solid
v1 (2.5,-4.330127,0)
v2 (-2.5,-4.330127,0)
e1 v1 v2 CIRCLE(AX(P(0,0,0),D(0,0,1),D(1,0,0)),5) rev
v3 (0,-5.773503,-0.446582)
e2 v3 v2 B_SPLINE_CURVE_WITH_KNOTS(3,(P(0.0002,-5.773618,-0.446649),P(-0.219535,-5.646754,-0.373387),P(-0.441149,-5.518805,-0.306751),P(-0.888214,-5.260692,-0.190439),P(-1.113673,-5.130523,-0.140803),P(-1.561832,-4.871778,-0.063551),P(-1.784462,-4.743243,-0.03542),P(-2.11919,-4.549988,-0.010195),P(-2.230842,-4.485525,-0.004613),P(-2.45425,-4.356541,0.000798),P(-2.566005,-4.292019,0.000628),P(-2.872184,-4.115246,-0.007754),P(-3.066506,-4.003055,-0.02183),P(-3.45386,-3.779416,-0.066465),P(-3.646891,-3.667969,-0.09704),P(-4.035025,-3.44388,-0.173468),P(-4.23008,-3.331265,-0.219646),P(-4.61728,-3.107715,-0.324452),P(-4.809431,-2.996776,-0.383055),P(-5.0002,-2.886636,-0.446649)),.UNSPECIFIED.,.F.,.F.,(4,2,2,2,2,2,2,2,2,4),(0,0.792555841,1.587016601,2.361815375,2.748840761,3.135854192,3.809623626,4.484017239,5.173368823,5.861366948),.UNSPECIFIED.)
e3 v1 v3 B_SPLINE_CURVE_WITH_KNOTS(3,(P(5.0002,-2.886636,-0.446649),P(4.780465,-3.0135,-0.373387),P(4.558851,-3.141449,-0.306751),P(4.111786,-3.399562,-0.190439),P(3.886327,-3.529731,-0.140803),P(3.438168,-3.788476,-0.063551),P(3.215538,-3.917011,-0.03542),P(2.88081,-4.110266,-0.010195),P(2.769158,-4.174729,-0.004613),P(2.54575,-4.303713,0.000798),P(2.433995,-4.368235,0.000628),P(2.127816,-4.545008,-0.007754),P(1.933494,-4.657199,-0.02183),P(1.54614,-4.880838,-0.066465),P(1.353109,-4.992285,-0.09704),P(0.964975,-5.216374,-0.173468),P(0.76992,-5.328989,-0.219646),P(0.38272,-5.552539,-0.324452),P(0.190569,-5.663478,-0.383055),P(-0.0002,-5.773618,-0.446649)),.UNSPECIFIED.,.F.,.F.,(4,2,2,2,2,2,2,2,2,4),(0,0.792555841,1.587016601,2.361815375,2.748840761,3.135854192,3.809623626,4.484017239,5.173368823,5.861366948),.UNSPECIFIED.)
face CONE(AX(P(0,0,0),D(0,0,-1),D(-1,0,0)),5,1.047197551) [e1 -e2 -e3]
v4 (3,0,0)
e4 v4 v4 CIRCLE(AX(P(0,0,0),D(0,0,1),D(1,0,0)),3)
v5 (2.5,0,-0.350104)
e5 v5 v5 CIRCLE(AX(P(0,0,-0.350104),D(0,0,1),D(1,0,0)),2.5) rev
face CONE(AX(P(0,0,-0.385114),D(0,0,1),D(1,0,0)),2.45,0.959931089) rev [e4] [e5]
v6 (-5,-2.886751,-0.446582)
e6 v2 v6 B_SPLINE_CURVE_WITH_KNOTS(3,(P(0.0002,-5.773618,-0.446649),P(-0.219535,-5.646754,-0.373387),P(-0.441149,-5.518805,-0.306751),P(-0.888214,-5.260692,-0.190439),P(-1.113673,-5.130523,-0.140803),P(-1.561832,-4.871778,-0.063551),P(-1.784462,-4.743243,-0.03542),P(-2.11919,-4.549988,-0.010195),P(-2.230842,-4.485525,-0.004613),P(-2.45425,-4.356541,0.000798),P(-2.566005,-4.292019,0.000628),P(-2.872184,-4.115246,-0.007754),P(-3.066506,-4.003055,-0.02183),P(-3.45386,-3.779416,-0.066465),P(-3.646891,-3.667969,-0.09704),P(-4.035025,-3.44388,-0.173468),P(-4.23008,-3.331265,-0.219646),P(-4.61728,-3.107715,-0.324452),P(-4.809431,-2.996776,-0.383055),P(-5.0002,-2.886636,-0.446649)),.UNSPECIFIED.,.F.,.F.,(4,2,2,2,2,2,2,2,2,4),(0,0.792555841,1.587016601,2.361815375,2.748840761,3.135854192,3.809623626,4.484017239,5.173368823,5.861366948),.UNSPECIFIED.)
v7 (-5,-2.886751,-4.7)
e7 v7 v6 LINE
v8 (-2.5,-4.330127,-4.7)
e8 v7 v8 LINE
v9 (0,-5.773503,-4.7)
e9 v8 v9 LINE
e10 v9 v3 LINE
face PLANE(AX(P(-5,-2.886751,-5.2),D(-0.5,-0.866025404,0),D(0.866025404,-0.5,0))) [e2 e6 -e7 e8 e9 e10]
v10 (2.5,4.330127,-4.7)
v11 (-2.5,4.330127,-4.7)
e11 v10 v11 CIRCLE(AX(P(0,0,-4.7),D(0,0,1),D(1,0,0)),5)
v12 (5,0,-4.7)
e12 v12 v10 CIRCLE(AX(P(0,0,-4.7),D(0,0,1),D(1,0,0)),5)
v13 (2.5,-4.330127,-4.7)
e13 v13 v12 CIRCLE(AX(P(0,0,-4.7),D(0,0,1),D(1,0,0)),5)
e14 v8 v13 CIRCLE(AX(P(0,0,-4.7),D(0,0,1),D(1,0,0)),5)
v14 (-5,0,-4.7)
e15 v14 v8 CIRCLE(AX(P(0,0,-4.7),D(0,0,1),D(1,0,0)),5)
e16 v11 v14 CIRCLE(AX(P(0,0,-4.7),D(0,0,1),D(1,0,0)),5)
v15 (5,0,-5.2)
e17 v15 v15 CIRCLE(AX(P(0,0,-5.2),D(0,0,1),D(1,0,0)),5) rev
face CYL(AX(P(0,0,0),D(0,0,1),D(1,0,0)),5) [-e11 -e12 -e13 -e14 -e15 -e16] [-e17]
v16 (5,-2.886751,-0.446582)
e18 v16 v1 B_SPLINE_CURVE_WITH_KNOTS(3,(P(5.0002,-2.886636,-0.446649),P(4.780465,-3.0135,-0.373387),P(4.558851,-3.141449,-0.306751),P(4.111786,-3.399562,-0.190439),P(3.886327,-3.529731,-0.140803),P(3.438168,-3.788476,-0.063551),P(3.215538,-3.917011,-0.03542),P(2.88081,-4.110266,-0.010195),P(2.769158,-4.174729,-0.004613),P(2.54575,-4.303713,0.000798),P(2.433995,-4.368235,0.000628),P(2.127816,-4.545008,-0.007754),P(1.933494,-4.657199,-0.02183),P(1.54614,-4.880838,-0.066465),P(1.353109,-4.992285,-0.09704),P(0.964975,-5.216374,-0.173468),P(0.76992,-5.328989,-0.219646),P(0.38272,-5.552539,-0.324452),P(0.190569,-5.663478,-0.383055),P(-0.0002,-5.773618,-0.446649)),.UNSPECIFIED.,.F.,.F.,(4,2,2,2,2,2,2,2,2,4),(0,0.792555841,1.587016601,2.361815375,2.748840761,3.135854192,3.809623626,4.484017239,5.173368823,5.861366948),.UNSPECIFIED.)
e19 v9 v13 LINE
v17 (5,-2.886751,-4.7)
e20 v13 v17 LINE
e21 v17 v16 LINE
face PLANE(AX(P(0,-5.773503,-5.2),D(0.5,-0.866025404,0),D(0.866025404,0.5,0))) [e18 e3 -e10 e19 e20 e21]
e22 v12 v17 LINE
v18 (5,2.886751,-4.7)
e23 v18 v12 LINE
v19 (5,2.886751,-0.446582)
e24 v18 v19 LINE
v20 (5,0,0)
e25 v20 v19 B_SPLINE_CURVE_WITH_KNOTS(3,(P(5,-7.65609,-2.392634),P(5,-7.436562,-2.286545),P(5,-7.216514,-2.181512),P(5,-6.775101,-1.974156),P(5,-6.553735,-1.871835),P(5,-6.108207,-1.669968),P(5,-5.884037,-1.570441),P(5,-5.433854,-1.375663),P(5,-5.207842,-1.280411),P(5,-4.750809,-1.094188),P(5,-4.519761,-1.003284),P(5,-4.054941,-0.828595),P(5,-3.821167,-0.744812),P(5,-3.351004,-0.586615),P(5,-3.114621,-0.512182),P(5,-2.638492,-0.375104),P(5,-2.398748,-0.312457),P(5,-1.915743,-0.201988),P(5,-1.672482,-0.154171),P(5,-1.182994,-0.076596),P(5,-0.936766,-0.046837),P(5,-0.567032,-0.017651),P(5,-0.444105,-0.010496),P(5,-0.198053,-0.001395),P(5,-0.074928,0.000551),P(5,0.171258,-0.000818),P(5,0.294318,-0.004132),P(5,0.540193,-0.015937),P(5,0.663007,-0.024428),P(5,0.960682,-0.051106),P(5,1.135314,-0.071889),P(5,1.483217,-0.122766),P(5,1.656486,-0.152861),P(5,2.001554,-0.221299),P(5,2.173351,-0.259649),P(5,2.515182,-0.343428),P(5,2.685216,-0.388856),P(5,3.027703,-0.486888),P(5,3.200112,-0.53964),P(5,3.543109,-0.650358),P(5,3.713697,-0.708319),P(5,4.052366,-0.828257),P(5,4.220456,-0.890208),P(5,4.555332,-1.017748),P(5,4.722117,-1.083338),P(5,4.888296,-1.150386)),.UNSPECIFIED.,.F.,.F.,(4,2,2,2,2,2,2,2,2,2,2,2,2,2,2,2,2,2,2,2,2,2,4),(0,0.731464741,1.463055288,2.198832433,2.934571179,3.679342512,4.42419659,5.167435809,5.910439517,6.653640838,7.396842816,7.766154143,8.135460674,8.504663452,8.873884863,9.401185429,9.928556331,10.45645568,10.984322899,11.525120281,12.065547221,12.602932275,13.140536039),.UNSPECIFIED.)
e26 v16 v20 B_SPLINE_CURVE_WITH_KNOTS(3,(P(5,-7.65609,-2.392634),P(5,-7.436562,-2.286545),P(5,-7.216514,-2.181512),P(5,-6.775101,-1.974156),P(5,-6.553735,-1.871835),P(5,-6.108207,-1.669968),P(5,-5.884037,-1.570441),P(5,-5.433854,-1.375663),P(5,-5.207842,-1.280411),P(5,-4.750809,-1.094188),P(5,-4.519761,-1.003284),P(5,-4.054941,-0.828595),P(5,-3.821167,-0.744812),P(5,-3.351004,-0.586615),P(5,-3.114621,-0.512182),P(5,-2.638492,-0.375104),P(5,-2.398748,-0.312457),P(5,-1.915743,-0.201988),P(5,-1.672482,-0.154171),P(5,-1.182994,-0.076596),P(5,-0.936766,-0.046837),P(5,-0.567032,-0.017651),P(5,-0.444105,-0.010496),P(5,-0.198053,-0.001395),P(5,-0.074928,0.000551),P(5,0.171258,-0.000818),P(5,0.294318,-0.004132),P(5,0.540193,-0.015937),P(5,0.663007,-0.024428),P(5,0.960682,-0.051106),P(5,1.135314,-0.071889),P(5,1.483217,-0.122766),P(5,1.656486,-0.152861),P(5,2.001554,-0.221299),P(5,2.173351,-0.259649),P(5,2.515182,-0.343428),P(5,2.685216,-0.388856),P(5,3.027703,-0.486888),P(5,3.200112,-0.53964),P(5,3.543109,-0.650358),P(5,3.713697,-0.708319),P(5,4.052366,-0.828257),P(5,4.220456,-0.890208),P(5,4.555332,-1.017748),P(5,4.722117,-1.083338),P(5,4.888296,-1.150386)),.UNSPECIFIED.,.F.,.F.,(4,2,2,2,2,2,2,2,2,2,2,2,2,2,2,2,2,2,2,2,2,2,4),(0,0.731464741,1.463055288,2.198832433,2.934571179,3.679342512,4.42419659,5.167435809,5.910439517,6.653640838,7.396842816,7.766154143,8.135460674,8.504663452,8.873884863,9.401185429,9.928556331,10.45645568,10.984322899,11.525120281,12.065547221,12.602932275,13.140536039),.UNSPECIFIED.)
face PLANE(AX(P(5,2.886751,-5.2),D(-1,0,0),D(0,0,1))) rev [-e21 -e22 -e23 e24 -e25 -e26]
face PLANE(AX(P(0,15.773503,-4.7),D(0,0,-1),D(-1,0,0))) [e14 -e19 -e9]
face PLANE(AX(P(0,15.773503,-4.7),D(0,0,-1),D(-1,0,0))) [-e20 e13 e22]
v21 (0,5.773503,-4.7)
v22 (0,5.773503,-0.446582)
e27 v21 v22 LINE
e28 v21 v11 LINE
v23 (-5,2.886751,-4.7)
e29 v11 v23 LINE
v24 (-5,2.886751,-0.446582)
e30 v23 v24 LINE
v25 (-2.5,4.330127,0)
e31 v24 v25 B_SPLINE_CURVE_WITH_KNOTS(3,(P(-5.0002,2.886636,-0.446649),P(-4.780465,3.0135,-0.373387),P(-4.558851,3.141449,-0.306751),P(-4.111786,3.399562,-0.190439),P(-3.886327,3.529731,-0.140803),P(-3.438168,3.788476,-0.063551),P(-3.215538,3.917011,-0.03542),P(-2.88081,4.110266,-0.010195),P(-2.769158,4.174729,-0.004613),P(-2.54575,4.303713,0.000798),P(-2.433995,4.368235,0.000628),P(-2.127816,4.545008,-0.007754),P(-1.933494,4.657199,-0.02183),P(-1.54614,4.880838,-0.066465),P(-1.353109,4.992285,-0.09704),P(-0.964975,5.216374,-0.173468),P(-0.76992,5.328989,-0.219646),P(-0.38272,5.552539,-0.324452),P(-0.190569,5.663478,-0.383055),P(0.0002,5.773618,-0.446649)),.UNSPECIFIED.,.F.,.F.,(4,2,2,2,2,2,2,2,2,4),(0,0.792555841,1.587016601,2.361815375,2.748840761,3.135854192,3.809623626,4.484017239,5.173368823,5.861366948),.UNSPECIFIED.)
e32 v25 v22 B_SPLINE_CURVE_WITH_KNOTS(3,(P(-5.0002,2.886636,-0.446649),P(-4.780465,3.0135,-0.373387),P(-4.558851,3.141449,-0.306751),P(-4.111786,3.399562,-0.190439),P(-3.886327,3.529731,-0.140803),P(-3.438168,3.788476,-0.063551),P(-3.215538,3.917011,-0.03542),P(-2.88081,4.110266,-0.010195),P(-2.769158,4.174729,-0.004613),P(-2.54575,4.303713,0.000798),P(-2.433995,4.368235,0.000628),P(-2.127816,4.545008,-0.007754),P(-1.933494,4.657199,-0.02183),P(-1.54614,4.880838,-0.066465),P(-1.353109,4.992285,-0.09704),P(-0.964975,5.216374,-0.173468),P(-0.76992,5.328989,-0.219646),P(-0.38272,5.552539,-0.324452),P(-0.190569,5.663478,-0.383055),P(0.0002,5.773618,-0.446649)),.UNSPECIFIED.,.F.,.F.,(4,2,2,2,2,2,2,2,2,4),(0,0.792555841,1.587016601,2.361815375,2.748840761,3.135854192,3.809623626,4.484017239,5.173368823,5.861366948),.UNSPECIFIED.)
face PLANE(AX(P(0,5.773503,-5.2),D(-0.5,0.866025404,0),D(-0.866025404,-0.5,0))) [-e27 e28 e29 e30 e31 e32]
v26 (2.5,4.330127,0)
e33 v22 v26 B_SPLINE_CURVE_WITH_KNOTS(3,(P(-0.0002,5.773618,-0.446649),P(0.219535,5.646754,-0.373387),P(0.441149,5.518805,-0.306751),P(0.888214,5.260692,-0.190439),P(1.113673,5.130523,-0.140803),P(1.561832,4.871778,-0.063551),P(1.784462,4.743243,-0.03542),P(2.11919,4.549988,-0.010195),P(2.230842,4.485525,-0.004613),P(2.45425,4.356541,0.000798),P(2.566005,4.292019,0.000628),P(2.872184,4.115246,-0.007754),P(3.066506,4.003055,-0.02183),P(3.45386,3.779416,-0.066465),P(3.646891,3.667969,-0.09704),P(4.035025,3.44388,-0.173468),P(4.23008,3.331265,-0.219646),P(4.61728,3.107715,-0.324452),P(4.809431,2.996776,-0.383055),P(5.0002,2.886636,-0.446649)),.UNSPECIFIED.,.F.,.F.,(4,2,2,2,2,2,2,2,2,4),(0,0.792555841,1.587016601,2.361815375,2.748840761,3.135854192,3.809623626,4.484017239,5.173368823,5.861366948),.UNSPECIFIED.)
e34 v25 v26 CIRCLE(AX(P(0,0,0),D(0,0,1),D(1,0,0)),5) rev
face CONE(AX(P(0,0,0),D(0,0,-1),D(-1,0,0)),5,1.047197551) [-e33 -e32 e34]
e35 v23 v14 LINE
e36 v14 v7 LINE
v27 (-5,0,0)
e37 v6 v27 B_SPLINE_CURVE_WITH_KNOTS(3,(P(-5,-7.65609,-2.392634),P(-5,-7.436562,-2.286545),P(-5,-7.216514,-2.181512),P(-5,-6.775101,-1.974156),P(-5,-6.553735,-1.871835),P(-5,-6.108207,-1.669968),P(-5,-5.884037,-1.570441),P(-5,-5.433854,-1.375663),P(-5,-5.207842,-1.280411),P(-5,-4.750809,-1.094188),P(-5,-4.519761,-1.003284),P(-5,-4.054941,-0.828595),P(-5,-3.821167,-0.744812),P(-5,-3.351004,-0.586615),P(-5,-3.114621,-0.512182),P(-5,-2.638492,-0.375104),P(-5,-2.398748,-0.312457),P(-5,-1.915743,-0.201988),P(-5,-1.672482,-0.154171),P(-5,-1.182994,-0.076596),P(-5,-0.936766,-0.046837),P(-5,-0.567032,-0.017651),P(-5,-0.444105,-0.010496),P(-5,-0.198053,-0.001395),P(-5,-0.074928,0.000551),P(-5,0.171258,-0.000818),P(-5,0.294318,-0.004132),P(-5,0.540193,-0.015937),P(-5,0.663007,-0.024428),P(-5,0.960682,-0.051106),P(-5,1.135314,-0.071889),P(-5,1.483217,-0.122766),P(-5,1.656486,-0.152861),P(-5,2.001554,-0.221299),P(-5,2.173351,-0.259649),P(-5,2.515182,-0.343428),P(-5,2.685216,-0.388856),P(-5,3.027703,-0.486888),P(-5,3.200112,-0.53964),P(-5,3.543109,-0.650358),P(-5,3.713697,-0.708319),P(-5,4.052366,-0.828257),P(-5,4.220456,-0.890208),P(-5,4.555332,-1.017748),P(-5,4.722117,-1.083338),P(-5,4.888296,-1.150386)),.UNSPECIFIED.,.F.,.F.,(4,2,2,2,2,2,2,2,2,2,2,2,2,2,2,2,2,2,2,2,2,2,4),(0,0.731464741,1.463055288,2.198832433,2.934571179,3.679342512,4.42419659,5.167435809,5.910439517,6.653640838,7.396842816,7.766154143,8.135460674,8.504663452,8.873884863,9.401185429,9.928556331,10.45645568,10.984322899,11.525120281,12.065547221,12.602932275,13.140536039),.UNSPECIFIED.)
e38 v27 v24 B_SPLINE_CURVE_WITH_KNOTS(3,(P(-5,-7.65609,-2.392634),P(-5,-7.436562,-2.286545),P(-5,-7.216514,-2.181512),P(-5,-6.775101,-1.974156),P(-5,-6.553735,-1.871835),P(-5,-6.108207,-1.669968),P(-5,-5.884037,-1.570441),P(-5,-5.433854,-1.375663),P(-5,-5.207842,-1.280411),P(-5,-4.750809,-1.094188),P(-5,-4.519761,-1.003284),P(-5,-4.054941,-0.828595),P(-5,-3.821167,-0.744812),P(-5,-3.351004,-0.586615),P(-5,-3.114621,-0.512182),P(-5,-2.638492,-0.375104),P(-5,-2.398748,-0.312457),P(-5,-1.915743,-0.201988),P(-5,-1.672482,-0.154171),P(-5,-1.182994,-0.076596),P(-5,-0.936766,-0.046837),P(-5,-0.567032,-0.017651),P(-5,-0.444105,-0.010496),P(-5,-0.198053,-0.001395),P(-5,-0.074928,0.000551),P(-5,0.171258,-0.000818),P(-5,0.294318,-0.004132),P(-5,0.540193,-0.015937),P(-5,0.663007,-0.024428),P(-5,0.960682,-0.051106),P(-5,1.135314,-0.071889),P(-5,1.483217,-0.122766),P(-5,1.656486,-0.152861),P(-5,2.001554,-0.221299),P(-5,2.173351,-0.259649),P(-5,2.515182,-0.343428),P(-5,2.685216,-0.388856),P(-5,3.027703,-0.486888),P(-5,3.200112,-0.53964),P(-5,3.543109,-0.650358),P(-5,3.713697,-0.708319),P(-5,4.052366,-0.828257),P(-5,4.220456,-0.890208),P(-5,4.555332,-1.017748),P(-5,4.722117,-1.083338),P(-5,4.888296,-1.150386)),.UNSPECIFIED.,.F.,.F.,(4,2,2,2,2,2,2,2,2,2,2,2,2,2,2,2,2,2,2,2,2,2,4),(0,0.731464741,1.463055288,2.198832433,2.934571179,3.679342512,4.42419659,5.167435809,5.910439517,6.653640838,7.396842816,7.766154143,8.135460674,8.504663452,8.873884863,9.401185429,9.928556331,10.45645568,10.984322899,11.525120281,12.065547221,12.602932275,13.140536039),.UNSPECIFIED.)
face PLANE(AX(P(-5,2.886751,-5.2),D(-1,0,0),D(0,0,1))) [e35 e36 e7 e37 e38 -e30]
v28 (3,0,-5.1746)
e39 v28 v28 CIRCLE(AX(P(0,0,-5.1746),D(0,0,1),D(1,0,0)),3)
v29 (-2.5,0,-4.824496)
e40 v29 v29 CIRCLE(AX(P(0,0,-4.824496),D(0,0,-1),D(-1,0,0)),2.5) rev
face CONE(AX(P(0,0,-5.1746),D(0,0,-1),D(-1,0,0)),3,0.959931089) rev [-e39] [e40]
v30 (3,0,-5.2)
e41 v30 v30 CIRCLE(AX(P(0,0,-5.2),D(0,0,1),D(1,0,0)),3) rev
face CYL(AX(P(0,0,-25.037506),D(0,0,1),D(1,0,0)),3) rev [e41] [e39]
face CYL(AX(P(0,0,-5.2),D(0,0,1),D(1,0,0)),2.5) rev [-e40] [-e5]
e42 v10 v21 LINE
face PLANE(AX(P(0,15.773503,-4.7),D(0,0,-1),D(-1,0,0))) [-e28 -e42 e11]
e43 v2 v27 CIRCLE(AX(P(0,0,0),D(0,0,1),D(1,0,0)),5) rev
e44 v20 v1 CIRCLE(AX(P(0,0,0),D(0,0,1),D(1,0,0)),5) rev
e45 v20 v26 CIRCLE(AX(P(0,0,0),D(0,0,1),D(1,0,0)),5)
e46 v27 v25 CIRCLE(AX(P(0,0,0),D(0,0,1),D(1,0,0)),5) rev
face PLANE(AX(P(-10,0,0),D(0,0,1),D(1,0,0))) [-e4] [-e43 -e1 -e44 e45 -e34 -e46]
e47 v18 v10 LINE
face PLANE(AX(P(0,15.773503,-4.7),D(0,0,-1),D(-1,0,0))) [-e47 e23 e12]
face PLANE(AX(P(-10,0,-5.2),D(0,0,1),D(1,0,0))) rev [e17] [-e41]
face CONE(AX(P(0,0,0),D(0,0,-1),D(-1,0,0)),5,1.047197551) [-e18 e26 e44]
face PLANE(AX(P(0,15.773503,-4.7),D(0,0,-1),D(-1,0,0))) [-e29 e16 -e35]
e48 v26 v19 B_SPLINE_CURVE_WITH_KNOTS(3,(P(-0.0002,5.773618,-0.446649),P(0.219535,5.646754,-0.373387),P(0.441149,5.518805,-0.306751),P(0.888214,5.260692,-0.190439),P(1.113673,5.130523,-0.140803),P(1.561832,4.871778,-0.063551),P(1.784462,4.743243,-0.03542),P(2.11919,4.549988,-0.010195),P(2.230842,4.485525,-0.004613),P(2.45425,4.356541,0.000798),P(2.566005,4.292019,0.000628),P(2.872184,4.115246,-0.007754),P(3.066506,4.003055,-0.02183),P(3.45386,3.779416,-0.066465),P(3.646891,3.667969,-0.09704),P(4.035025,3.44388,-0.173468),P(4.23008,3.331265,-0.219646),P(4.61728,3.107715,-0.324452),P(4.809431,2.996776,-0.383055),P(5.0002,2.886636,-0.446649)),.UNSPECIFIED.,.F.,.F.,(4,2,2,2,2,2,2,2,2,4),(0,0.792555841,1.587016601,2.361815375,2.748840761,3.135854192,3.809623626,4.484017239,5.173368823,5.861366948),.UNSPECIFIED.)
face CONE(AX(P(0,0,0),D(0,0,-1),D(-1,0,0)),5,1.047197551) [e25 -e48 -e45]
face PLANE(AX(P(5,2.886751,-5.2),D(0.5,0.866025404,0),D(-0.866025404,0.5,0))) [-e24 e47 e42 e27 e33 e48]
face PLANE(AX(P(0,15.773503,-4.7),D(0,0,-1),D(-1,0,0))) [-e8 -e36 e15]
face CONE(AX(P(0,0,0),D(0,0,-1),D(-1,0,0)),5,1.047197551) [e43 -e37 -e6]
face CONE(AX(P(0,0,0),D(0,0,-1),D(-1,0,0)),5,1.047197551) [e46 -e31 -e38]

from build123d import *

# Parameters (mm, degrees)
BASENUT_START = -5.2
BASENUTSKE_R  = 2.5
BASENUT_DEPTH = 5.2
SKETCH4_W     = 0.5
SKETCH4_H     = 10.773502692


# Read off the part's stored shape, not the designer's step: ThreadSchematic
with BuildPart() as part:
    # BaseNutSke → BaseNut (new body)
    with BuildSketch(Plane.XY.offset(BASENUT_START)):
        Polygon((5, 2.886751346), (5, -2.886751346), (0, -5.773502692), (-5, -2.886751346), (-5, 2.886751346), (0, 5.773502692), align=None)
        Circle(BASENUTSKE_R, mode=Mode.SUBTRACT)
    extrude(amount=BASENUT_DEPTH)

    # Sketch5 (on Front Plane) → EndChamfer (revolve, cut)
    with BuildSketch(Plane.XY):
        Polygon((5.1746, 3), (4.789485854, 2.45), (5.2254, 2.45), (5.2254, 3), align=None)
    revolve(axis=Axis((5.2254, 2.45, 0), (-1, 0, 0)), mode=Mode.SUBTRACT)

    # Sketch4 → Bearing-Face (revolve, cut)
    with BuildSketch(Plane(origin=(0, 0, 0), x_dir=(0, 0, -1), z_dir=(1, 0, 0)), mode=Mode.PRIVATE) as bearing_face_sk:
        with Locations((4.95, 10.386751346)):
            Rectangle(SKETCH4_W, SKETCH4_H)
        Polygon((0, 5), (-10, 5), (-10, 15.773502692), (0.446581987, 15.773502692), (0.446581987, 5.773502692), align=None)
    revolve(bearing_face_sk.sketch.rotate(Axis((0, 0, 0), (0, 0, -1)), 90), axis=Axis((0, 0, 0), (0, 0, -1)), mode=Mode.SUBTRACT)

    # ThreadSchematic outline → ThreadSchematic (revolve, cut)
    with BuildSketch(Plane.XZ):
        Polygon((2.5, 0), (2.5, -0.350103769), (3, 0), align=None)
        Polygon((3, -5.1746), (2.5, -4.824496231), (2.5, -5.2), (3, -5.2), align=None)
    revolve(axis=Axis((0, 0, 0), (0, 0, 1)), mode=Mode.SUBTRACT)


solid = part.part
